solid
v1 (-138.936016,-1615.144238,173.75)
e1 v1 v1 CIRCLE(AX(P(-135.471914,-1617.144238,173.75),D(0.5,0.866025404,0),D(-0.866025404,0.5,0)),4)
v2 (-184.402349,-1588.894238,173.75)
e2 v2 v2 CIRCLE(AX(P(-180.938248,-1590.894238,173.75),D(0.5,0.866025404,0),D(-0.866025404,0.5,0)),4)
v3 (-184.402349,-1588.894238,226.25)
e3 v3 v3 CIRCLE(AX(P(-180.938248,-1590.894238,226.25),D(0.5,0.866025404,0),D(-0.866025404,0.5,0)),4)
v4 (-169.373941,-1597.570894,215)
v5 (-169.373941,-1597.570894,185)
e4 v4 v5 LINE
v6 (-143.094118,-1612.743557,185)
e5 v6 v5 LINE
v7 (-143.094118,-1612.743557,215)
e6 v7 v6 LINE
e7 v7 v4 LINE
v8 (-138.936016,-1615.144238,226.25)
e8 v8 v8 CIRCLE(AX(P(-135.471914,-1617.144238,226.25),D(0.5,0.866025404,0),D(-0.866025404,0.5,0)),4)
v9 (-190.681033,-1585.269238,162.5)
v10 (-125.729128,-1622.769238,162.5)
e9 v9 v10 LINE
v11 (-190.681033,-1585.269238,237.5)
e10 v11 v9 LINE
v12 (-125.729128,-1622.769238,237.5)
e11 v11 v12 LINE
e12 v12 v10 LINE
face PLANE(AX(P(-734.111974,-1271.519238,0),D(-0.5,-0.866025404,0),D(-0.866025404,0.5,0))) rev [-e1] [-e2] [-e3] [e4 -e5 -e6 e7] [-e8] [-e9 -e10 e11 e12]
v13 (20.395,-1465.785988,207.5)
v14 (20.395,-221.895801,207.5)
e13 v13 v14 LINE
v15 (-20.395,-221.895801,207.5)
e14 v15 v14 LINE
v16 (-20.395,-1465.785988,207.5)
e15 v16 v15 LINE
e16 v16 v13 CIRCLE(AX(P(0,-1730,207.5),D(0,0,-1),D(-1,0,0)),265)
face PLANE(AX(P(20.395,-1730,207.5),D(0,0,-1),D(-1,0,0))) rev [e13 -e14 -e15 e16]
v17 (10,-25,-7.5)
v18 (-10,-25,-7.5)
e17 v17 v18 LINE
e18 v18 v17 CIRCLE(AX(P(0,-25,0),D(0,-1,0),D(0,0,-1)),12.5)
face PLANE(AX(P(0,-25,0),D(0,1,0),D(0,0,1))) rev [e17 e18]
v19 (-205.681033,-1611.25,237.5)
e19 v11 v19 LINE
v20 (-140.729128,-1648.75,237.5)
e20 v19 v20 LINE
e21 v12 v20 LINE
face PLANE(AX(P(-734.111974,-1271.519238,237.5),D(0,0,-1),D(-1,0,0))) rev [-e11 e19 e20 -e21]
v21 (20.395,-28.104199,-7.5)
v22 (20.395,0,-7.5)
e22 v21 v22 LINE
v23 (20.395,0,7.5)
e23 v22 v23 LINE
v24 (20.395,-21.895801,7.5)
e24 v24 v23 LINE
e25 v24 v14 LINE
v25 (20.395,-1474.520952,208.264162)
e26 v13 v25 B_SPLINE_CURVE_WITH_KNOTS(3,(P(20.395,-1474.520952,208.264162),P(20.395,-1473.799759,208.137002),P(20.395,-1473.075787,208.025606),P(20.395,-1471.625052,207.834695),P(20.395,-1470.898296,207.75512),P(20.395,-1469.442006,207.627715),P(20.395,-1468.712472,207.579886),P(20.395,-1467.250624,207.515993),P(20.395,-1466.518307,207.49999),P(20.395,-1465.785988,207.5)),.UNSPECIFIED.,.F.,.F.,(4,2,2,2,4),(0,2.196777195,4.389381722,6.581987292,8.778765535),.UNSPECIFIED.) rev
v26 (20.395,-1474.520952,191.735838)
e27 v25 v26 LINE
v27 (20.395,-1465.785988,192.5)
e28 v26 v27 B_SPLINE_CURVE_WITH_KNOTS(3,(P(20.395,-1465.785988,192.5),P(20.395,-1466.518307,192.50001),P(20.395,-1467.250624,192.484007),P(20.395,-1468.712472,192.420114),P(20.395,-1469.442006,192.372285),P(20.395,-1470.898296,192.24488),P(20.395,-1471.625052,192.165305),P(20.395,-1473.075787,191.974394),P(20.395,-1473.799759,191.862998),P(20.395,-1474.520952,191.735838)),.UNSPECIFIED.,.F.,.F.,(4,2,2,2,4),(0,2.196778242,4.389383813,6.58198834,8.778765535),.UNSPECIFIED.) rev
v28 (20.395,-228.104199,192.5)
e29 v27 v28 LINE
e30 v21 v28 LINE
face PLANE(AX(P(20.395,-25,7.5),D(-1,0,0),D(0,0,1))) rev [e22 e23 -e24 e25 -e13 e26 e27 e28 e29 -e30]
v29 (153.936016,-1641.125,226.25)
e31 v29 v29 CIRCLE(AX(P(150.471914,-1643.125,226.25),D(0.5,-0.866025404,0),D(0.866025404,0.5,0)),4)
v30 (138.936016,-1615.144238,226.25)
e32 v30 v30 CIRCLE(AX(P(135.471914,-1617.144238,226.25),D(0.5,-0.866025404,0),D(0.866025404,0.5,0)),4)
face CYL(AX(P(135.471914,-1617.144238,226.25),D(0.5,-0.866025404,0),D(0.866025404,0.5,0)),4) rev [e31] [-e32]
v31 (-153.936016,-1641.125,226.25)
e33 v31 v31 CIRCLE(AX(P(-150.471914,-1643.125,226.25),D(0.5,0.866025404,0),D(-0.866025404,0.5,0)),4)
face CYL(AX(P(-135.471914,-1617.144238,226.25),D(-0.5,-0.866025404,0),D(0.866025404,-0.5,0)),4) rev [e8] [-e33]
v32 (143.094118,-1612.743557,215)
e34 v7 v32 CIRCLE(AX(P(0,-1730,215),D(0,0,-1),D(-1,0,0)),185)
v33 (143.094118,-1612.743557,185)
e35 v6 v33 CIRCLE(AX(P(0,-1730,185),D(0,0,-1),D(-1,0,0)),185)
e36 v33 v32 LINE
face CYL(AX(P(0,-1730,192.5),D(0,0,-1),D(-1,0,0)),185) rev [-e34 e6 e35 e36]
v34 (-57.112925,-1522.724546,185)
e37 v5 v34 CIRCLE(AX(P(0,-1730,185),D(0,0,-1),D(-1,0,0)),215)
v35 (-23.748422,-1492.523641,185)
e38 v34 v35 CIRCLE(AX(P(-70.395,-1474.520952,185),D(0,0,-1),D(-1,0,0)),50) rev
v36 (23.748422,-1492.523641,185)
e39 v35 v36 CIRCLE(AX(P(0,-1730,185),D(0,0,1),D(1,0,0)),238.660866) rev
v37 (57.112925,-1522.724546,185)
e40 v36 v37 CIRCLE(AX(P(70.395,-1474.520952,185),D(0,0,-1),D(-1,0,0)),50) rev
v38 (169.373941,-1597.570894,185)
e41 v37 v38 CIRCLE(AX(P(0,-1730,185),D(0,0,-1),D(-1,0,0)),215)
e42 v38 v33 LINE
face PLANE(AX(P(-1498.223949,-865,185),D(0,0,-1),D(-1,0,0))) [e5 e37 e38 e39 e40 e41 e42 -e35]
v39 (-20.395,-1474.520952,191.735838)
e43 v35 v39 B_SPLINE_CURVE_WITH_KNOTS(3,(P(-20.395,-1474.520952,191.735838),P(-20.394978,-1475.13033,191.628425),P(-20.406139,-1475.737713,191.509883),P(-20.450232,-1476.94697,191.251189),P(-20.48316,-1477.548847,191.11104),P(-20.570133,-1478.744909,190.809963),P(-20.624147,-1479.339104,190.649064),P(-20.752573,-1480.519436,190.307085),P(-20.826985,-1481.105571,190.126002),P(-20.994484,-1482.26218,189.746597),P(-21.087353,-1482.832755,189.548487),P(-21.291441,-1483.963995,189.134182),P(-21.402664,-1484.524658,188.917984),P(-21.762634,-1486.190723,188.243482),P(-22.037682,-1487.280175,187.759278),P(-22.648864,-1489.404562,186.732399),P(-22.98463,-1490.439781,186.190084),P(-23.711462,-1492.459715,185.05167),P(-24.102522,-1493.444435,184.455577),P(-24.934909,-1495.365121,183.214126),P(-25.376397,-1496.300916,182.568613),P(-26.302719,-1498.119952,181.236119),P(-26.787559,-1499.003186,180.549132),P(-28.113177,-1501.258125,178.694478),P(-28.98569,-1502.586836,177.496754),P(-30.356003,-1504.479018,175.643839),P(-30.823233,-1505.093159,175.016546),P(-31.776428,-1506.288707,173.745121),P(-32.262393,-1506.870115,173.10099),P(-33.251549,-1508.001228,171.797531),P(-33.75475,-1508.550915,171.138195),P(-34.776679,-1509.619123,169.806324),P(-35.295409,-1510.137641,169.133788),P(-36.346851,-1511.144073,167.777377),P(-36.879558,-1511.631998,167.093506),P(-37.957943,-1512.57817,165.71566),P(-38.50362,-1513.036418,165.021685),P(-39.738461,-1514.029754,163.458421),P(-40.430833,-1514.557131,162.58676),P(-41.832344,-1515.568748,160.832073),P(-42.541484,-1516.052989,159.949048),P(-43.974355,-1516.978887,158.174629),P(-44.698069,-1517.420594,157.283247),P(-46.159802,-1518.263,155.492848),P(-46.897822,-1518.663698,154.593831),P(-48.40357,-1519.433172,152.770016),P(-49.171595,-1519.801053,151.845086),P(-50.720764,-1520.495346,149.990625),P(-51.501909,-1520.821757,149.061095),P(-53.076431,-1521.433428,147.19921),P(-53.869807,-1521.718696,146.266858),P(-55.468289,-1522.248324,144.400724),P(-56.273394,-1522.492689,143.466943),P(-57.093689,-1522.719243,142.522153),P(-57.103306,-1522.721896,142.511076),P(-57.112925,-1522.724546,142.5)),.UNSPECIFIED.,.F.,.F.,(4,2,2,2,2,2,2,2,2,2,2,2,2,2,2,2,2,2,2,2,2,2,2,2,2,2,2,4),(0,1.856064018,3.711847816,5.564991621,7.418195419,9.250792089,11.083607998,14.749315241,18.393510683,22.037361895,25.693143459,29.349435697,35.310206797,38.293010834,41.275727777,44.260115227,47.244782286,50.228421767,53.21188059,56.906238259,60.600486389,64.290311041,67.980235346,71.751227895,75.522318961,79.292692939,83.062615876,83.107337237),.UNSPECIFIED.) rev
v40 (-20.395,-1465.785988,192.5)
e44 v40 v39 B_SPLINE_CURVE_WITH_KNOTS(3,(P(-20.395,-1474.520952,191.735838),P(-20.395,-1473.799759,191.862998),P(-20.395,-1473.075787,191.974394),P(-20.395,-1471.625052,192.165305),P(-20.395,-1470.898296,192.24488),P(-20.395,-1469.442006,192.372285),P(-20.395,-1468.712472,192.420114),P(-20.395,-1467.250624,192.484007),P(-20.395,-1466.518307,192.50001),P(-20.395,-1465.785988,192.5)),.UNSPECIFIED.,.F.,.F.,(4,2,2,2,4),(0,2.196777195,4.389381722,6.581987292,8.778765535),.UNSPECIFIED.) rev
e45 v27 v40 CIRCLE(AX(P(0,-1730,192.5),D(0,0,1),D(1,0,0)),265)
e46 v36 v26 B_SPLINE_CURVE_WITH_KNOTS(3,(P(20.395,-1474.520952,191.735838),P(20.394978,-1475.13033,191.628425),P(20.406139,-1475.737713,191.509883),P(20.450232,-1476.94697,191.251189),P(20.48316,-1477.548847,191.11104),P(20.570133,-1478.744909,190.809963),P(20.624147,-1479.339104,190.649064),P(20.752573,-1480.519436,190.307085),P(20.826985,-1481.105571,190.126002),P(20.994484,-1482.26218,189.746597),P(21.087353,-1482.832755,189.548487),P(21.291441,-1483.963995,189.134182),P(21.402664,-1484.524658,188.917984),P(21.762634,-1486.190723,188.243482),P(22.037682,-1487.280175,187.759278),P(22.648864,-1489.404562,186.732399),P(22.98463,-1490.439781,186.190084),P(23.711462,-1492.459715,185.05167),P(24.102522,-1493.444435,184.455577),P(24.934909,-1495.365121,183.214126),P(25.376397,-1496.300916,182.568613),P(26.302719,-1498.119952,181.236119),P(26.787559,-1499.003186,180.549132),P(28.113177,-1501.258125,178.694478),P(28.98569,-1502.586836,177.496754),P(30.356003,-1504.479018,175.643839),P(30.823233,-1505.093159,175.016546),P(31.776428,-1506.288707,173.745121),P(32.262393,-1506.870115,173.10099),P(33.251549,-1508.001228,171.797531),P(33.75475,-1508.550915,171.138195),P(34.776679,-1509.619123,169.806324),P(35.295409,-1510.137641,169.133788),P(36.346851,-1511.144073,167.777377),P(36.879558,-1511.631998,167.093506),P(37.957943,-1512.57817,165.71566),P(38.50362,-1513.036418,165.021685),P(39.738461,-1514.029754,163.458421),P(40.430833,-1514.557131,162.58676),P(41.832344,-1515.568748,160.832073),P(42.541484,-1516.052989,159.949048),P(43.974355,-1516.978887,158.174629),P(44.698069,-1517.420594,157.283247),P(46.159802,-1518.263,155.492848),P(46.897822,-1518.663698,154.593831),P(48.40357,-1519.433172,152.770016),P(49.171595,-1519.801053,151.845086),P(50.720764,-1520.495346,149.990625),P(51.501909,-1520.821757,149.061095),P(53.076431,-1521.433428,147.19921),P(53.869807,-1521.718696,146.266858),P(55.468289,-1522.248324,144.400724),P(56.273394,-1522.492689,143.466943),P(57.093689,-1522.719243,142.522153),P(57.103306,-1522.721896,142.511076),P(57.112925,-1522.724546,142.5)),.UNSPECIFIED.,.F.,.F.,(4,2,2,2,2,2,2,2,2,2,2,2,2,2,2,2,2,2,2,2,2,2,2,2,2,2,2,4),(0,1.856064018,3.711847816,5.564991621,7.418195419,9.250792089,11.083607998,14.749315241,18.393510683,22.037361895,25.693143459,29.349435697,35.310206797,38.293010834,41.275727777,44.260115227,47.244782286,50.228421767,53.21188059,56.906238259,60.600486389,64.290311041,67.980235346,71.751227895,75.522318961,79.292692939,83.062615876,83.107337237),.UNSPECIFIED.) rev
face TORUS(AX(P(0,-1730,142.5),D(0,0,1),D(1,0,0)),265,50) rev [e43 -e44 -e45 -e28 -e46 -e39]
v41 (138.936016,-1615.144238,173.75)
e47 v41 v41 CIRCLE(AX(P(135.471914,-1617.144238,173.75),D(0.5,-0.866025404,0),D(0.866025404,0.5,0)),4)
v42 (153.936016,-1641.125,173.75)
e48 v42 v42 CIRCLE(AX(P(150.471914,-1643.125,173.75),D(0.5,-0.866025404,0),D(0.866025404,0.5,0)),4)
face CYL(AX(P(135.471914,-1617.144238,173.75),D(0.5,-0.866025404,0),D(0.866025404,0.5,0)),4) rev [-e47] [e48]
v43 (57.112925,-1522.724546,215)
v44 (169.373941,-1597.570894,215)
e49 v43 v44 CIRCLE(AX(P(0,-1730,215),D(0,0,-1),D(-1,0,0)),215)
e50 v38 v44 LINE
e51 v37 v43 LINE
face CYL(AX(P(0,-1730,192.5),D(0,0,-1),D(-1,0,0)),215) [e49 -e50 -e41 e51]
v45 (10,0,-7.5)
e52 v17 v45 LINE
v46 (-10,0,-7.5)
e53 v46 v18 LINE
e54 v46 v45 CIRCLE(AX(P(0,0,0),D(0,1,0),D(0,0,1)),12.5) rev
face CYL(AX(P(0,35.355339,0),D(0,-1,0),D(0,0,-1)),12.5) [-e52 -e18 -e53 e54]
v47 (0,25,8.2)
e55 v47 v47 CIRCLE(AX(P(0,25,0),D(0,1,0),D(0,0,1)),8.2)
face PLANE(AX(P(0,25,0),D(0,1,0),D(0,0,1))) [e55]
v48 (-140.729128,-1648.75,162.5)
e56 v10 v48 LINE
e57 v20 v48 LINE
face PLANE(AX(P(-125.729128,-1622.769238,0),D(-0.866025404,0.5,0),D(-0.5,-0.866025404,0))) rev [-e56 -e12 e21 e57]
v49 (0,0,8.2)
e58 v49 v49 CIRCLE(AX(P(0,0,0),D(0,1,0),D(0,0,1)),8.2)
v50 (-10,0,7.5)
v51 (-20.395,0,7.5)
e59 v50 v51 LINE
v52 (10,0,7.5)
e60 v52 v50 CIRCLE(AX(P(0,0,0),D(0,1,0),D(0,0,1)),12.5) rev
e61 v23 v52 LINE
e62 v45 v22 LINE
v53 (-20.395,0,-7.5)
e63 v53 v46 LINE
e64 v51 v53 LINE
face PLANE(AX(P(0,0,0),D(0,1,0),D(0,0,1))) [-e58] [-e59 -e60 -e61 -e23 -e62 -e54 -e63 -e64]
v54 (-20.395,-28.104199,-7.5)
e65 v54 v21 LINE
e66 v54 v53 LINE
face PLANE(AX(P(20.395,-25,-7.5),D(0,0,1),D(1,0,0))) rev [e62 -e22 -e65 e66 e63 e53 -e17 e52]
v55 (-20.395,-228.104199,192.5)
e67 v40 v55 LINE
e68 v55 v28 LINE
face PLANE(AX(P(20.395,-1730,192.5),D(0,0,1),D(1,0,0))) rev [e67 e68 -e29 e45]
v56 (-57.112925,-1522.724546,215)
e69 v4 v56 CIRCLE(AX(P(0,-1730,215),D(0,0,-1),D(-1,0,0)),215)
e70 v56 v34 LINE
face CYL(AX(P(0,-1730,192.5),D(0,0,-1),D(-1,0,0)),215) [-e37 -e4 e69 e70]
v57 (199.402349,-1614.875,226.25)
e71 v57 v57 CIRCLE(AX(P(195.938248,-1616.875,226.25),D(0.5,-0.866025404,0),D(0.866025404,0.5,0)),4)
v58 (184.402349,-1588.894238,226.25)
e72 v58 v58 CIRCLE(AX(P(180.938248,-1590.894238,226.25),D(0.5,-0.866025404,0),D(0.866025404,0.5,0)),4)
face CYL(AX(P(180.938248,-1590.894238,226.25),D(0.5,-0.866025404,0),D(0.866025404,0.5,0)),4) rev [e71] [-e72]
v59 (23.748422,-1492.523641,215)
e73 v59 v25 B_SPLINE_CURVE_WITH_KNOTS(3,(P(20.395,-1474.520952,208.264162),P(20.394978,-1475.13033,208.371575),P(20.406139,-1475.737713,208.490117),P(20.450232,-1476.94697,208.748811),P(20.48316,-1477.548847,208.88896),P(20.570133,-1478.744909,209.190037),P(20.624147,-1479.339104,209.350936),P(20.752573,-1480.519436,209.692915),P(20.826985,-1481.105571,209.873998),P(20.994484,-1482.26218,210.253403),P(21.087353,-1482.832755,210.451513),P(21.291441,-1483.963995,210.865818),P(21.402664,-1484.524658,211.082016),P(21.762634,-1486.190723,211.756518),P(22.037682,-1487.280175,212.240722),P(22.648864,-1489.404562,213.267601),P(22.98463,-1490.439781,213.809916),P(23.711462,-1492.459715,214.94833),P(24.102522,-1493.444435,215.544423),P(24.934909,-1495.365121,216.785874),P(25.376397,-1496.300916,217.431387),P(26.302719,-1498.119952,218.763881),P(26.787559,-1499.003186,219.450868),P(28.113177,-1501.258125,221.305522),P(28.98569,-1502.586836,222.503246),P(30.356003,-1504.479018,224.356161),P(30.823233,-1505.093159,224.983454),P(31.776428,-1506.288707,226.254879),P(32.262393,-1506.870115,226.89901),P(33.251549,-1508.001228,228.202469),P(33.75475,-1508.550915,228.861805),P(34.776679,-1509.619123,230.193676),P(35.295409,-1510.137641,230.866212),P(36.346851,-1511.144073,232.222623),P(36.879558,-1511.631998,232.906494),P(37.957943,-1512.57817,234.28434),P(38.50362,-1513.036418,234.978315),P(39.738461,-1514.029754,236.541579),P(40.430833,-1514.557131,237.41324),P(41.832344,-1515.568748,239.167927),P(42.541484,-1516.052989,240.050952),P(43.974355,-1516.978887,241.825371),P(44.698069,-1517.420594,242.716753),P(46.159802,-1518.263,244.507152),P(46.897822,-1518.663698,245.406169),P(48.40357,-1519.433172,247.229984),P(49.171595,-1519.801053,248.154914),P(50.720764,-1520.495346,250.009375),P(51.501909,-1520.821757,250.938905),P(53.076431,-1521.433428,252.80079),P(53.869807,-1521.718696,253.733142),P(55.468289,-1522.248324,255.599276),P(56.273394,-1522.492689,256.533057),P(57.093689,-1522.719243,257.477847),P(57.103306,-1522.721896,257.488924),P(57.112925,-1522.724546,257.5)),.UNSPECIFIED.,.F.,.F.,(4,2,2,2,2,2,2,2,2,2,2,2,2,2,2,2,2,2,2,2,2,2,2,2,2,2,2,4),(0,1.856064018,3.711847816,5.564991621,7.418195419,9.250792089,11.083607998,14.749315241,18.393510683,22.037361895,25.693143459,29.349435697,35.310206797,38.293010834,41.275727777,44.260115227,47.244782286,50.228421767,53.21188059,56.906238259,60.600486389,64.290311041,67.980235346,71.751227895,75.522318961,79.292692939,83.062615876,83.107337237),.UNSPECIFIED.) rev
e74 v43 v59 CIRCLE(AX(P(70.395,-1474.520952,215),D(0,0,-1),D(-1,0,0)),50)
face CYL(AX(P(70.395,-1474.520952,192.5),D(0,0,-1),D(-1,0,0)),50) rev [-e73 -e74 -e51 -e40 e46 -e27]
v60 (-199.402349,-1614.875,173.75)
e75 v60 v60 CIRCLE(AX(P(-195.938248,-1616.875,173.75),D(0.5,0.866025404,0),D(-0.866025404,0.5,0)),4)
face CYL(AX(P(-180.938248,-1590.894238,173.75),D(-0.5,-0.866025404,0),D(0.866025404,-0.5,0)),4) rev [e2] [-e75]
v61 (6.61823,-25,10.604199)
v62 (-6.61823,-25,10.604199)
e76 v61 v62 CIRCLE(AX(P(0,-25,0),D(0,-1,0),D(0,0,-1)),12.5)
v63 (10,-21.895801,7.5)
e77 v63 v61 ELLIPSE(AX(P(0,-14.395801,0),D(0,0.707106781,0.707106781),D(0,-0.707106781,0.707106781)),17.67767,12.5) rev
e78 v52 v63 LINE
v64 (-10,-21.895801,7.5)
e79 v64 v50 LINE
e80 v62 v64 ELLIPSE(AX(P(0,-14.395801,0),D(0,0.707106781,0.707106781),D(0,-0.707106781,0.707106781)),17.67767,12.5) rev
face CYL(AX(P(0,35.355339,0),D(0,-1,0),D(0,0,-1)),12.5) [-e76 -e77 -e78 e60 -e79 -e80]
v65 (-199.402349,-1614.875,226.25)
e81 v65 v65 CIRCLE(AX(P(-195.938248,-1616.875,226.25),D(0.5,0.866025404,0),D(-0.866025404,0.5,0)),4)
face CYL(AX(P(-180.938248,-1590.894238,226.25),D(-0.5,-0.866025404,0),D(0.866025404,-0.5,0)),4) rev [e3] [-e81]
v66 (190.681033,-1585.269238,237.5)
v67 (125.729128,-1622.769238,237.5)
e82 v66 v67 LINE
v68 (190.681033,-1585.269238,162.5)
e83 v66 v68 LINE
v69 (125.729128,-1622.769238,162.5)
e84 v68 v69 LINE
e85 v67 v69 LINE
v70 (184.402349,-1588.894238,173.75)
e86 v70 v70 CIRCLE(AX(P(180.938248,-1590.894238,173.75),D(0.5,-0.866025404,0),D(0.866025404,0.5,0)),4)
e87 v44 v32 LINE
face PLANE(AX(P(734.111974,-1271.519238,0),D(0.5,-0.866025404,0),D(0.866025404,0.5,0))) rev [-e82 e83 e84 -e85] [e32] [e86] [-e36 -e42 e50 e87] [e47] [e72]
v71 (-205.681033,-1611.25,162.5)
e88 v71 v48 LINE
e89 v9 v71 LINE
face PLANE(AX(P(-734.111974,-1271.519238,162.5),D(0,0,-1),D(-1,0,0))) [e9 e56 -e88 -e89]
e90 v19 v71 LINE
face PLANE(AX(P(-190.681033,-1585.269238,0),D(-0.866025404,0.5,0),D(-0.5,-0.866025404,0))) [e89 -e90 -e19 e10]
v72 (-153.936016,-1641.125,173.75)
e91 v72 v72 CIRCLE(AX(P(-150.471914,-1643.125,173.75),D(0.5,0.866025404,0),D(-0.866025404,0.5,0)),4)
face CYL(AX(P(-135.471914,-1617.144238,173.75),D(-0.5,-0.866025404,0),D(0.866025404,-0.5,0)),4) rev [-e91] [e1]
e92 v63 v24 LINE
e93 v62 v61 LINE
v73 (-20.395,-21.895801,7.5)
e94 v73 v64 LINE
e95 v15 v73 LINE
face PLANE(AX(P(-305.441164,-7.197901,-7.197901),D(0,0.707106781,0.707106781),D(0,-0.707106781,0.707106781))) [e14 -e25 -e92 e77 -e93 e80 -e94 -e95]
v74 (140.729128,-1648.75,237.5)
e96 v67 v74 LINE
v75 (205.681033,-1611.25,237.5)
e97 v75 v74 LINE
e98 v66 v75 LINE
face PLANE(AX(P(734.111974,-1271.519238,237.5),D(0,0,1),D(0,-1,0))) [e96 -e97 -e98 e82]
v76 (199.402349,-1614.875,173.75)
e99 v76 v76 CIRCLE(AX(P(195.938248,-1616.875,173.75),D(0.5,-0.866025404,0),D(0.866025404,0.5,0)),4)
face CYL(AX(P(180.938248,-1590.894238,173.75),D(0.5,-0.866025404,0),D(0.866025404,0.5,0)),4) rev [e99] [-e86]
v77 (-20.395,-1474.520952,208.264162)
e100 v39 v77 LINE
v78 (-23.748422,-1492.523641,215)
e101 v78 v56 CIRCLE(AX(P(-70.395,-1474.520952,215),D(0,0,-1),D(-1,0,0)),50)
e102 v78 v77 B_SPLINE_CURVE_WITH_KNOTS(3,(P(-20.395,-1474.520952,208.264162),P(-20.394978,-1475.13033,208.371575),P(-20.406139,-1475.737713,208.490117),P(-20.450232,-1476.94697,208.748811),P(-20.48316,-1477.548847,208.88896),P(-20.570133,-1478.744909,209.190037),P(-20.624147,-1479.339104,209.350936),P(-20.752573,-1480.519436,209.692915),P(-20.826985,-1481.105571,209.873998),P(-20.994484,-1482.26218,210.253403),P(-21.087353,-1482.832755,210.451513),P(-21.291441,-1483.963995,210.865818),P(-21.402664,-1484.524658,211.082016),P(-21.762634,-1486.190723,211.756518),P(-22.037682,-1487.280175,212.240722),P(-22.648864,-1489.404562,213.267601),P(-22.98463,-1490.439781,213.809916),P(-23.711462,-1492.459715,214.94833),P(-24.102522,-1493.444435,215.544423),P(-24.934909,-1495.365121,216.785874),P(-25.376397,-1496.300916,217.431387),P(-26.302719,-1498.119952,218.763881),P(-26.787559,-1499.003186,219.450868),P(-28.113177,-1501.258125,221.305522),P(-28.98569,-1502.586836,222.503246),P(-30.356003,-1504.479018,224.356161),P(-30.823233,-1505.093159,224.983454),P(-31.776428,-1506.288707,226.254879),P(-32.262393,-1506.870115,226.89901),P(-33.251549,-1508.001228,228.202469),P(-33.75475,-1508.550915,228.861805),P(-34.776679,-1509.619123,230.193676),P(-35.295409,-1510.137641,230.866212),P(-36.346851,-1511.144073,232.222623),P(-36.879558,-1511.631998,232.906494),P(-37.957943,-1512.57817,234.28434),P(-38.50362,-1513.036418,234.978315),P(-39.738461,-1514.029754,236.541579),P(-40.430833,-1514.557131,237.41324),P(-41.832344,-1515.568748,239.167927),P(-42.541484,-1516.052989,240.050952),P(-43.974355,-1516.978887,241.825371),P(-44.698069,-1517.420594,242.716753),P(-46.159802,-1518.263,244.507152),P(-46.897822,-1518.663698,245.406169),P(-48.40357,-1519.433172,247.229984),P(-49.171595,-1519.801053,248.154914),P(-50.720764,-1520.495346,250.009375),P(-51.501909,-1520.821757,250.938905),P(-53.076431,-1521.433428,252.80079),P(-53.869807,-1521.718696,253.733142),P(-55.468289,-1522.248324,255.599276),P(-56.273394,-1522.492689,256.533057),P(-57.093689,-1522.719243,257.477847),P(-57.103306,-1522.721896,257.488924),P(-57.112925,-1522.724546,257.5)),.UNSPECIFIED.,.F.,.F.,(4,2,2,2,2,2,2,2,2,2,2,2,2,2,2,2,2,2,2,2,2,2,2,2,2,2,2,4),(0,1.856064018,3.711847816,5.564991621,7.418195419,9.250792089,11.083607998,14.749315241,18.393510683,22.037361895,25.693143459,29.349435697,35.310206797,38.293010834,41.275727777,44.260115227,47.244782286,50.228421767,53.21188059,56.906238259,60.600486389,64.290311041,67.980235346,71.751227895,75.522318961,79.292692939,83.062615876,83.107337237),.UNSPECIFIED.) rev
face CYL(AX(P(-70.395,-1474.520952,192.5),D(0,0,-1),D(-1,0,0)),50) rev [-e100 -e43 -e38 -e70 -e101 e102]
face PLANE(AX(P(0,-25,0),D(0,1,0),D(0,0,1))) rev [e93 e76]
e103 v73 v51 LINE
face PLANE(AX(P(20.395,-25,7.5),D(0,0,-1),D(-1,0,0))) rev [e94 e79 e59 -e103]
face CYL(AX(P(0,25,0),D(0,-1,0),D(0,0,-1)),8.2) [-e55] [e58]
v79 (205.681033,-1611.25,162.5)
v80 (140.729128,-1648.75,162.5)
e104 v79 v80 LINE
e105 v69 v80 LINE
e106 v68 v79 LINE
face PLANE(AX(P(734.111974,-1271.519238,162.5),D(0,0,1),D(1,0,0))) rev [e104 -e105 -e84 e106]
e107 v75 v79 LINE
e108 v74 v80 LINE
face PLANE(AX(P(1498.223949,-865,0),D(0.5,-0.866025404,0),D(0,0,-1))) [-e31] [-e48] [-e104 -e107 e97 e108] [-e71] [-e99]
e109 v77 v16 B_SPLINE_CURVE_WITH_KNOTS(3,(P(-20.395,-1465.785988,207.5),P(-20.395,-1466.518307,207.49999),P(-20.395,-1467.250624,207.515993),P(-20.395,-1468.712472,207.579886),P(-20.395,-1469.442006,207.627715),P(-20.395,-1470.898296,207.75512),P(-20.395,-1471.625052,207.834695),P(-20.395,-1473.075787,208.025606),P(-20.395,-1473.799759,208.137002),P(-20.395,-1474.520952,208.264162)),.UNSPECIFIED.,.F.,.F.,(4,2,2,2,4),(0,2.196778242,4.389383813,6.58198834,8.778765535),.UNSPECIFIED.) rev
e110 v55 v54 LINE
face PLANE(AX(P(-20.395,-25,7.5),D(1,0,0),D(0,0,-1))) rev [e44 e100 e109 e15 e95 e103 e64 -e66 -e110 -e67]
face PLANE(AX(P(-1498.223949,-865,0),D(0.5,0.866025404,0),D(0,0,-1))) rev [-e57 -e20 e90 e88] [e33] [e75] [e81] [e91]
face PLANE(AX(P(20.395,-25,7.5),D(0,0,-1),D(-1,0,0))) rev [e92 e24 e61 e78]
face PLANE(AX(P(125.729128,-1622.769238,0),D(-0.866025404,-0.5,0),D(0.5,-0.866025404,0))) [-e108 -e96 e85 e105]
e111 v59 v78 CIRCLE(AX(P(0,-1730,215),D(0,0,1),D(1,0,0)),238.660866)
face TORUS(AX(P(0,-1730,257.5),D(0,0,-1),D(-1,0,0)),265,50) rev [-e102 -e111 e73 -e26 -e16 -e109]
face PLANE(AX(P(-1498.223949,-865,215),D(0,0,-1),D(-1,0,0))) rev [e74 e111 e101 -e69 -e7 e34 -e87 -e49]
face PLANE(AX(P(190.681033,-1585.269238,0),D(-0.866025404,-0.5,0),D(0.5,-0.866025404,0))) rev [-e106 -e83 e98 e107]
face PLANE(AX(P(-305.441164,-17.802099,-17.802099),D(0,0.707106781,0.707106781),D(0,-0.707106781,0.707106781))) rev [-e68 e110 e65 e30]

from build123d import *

# Parameters (mm, degrees)
SKETCH1_R                = 8.2
BOSS_EXTRUDE1_DEPTH      = 25
SKETCH2_W                = 40.79
SKETCH2_H                = 15
BOSS_EXTRUDE2_DEPTH      = 25
SKETCH3_R                = 12.5
BOSS_EXTRUDE4_DEPTH      = 25
BOSS_EXTRUDE5_REACH      = 51.448
SKETCH5_W                = 40.79
SKETCH5_H                = 15
BOSS_EXTRUDE7_DEPTH      = 1505
BOSS_EXTRUDE8_START      = -40.79
BOSS_EXTRUDE8_DEPTH      = 40.79
SKETCH9_W                = 15
SKETCH9_H                = 15
REVOLVE1_ANGLE           = 60
REVOLVE1_OTHER_WAY_ANGLE = 60
FILLET3_R                = 50
SKETCH11_W               = 75
SKETCH11_H               = 75
SKETCH11_R               = 4
BOSS_EXTRUDE9_DEPTH      = 30
CUT_EXTRUDE2_DEPTH       = 1755.203433898


with BuildPart() as part:
    # Sketch1 → Boss-Extrude1 (new body)
    with BuildSketch(Plane(origin=(0, 0, 0), x_dir=(1, 0, 0), z_dir=(0, 1, 0))):
        with Locations(Location((0, 0, 0), (0, 0, 270))):
            Circle(SKETCH1_R)
    extrude(amount=BOSS_EXTRUDE1_DEPTH)

    # Sketch2 → Boss-Extrude2 (add)
    with BuildSketch(Plane(origin=(0, 0, 0), x_dir=(-1, 0, 0), z_dir=(0, -1, 0))):
        Rectangle(SKETCH2_W, SKETCH2_H)
    extrude(amount=BOSS_EXTRUDE2_DEPTH)

    # Sketch3 → Boss-Extrude4 (add)
    with BuildSketch(Plane(origin=(0, -25, 0), x_dir=(-1, 0, 0), z_dir=(0, -1, 0))):
        Circle(SKETCH3_R)
    extrude(amount=-BOSS_EXTRUDE4_DEPTH)

    # Boss-Extrude5: up to this face of the body (flat: up to its plane)
    boss_extrude5_end = Plane(part.part.faces().sort_by_distance((20.395, -12.5, 0))[0])
    # Sketch4 → Boss-Extrude5 (add, up to the picked face)
    with BuildSketch(Plane.ZY.offset(20.395), mode=Mode.PRIVATE) as boss_extrude5_sk1:
        Polygon((192.5, -225), (-7.5, -25), (7.5, -25), (207.5, -225), align=None)
    boss_extrude5_tool1 = split(extrude(boss_extrude5_sk1.sketch, amount=-BOSS_EXTRUDE5_REACH, mode=Mode.PRIVATE), bisect_by=boss_extrude5_end, keep=Keep.BOTH, mode=Mode.PRIVATE)
    add(boss_extrude5_tool1.solids().sort_by(Axis((-20.395, -125, 100), (1, 0, 0)))[0])

    # Sketch5 → Boss-Extrude7 (add)
    with BuildSketch(Plane(origin=(0, -225, 0), x_dir=(-1, 0, 0), z_dir=(0, -1, 0))):
        with Locations((0, -200)):
            Rectangle(SKETCH5_W, SKETCH5_H)
    extrude(amount=BOSS_EXTRUDE7_DEPTH)

    # Sketch7 → Boss-Extrude8 (add)
    with BuildSketch(Plane(origin=(20.395, 0, 0), x_dir=(0, 0, -1), z_dir=(1, 0, 0)).offset(BOSS_EXTRUDE8_START)):
        Polygon((1.552099385, -34.052099385), (0, -32.5), (-192.5, -225), (-192.5, -228.104198769), align=None)
        Polygon((7.5, -25), (0, -32.5), (1.552099385, -34.052099385), (7.5, -28.104198769), align=None)
        Polygon((-9.052099385, -23.447900615), (-207.5, -221.895801231), (-207.5, -225), (-7.5, -25), align=None)
        Polygon((-9.052099385, -23.447900615), (-7.5, -25), (-7.5, -21.895801231), align=None)
    extrude(amount=BOSS_EXTRUDE8_DEPTH)

    # Sketch9 → Revolve1 (revolve)
    with BuildSketch(Plane(origin=(0, 0, 0), x_dir=(0, 0, -1), z_dir=(1, 0, 0))):
        with Locations((-207.5, -1522.5)):
            Rectangle(SKETCH9_W, SKETCH9_H)
        Polygon((-185, -1545), (-185, -1530), (-200, -1530), (-215, -1530), (-215, -1545), align=None)
        with Locations((-192.5, -1522.5)):
            Rectangle(SKETCH9_W, SKETCH9_H)
    revolve(axis=Axis((0, -1730, 192.5), (0, 0, 1)), revolution_arc=REVOLVE1_ANGLE)

    # Sketch9 → Revolve1 other way (revolve)
    with BuildSketch(Plane(origin=(0, 0, 0), x_dir=(0, 0, -1), z_dir=(1, 0, 0))):
        with Locations((-207.5, -1522.5)):
            Rectangle(SKETCH9_W, SKETCH9_H)
        Polygon((-185, -1545), (-185, -1530), (-200, -1530), (-215, -1530), (-215, -1545), align=None)
        with Locations((-192.5, -1522.5)):
            Rectangle(SKETCH9_W, SKETCH9_H)
    revolve(axis=Axis((0, -1730, 192.5), (0, 0, -1)), revolution_arc=REVOLVE1_OTHER_WAY_ANGLE)

    # Fillet3
    # the kernel refuses this fillet: 50 mm, written as the material it adds along each edge
    with BuildSketch(Plane(origin=(0, -1730, 207.5), x_dir=(0.6259913130832682, 0.7798300301631668, 0), z_dir=(0.7798300301631668, -0.6259913130832682, 0))) as fillet3_piece_1_section:
        with BuildLine():
            CenterArc((215 + FILLET3_R, FILLET3_R), FILLET3_R, 180, 90)
            Line((215, FILLET3_R), (215, 0))
            Line((215, 0), (215 + FILLET3_R, 0))
        make_face()
    fillet3_piece_1 = revolve(axis=Axis((0, -1730, 207.5), (0, 0, 1)), revolution_arc=77.509968484, mode=Mode.PRIVATE)
    fillet3_piece_1 = split(fillet3_piece_1, bisect_by=Plane(origin=(20.395, -1497.728593149, 210.201005202), z_dir=(-1, 0, 0)), keep=Keep.TOP, mode=Mode.PRIVATE)
    fillet3_piece_1 = split(fillet3_piece_1, bisect_by=Plane(origin=(-20.395, -1497.728593149, 210.201005202), z_dir=(1, 0, 0)), keep=Keep.TOP, mode=Mode.PRIVATE)
    fillet3_piece_1 = split(fillet3_piece_1, bisect_by=Plane(origin=(0, -1497.728593149, 215), z_dir=(0, 0, -1)), keep=Keep.TOP, mode=Mode.PRIVATE)
    add(fillet3_piece_1)
    with BuildSketch(Plane(origin=(-20.395, -1515.969525593, 192.5), x_dir=(-0.9834951946600375, -0.1809342479482942, 0), z_dir=(0, 0, 1))) as fillet3_piece_2:
        with BuildLine():
            CenterArc((41.675293239, -49.811185367), FILLET3_R, 94.980893043, 74.594925131)
            Line((-7.499466494, -40.764472969), (0, 0))
            ThreePointArc((0, 0), (18.66705843, -0.811902923), (37.33411686, 0))
        make_face()
    extrude(amount=15)
    with BuildSketch(Plane(origin=(0, -1730, 192.5), x_dir=(0.6259913130832687, 0.7798300301631664, 0), z_dir=(0.7798300301631664, -0.6259913130832687, 0))) as fillet3_piece_3_section:
        with BuildLine():
            CenterArc((215 + FILLET3_R, -FILLET3_R), FILLET3_R, 90, 90)
            Line((215 + FILLET3_R, 0), (215, 0))
            Line((215, 0), (215, -FILLET3_R))
        make_face()
    fillet3_piece_3 = revolve(axis=Axis((0, -1730, 192.5), (0, 0, 1)), revolution_arc=77.509968484, mode=Mode.PRIVATE)
    fillet3_piece_3 = split(fillet3_piece_3, bisect_by=Plane(origin=(0, -1497.728593149, 185), z_dir=(0, 0, 1)), keep=Keep.TOP, mode=Mode.PRIVATE)
    fillet3_piece_3 = split(fillet3_piece_3, bisect_by=Plane(origin=(-20.395, -1497.728593149, 189.798994798), z_dir=(1, 0, 0)), keep=Keep.TOP, mode=Mode.PRIVATE)
    fillet3_piece_3 = split(fillet3_piece_3, bisect_by=Plane(origin=(20.395, -1497.728593149, 189.798994798), z_dir=(-1, 0, 0)), keep=Keep.TOP, mode=Mode.PRIVATE)
    add(fillet3_piece_3)
    with BuildSketch(Plane(origin=(20.395, -1515.969525593, 192.5), x_dir=(0.9834951946600374, -0.18093424794829469, 0), z_dir=(0, 0, 1))) as fillet3_piece_4:
        with BuildLine():
            CenterArc((41.675293239, 49.811185367), FILLET3_R, 190.424181826, 74.594925131)
            Line((-7.499466494, 40.764472969), (0, 0))
            ThreePointArc((0, 0), (18.66705843, 0.811902923), (37.33411686, 0))
        make_face()
    extrude(amount=15)
    with BuildSketch(Plane(origin=(0, -1730, 207.5), x_dir=(0.6259913130832682, 0.7798300301631668, 0), z_dir=(0.7798300301631668, -0.6259913130832682, 0))) as fillet3_piece_5a_section:
        with BuildLine():
            CenterArc((215 + FILLET3_R, FILLET3_R), FILLET3_R, 180, 90)
            Line((215, FILLET3_R), (215, 0))
            Line((215, 0), (215 + FILLET3_R, 0))
        make_face()
    fillet3_piece_5a = revolve(axis=Axis((0, -1730, 207.5), (0, 0, 1)), revolution_arc=77.509968484, mode=Mode.PRIVATE)
    fillet3_piece_5a = split(fillet3_piece_5a, bisect_by=Plane(origin=(20.395, -1516.663886588, 210.150724115), z_dir=(1, 0, 0)), keep=Keep.TOP, mode=Mode.PRIVATE)
    fillet3_piece_5a = split(fillet3_piece_5a, bisect_by=Plane(origin=(85.698064456, -1516.663886588, 215), z_dir=(0, 0, -1)), keep=Keep.TOP, mode=Mode.PRIVATE)
    with BuildSketch(Plane(origin=(20.395, -1515.969525593, 192.5), x_dir=(0.9834951946600374, -0.18093424794829469, 0), z_dir=(0, 0, 1))) as fillet3_piece_5b_section:
        with BuildLine():
            CenterArc((41.675293239, 49.811185367), FILLET3_R, 190.424181826, 74.594925131)
            Line((-7.499466494, 40.764472969), (0, 0))
            ThreePointArc((0, 0), (18.66705843, 0.811902923), (37.33411686, 0))
        make_face()
    fillet3_piece_5b = extrude(amount=118.621434021, mode=Mode.PRIVATE)
    fillet3_piece_5b = split(fillet3_piece_5b, bisect_by=Plane(origin=(28.539652215, -1507.603520272, 207.5), z_dir=(0, 0, 1)), keep=Keep.TOP, mode=Mode.PRIVATE)
    fillet3_piece_5b = split(fillet3_piece_5b, bisect_by=Plane(origin=(28.539652215, -1507.603520272, 215), z_dir=(0, 0, -1)), keep=Keep.TOP, mode=Mode.PRIVATE)
    fillet3_piece_5 = fillet3_piece_5a & fillet3_piece_5b
    add(fillet3_piece_5)
    with BuildSketch(Plane(origin=(0, -1730, 207.5), x_dir=(0.6259913130832682, 0.7798300301631668, 0), z_dir=(0.7798300301631668, -0.6259913130832682, 0))) as fillet3_piece_6a_section:
        with BuildLine():
            CenterArc((215 + FILLET3_R, FILLET3_R), FILLET3_R, 180, 90)
            Line((215, FILLET3_R), (215, 0))
            Line((215, 0), (215 + FILLET3_R, 0))
        make_face()
    fillet3_piece_6a = revolve(axis=Axis((0, -1730, 207.5), (0, 0, 1)), revolution_arc=77.509968484, mode=Mode.PRIVATE)
    fillet3_piece_6a = split(fillet3_piece_6a, bisect_by=Plane(origin=(-20.395, -1516.663887252, 210.150724175), z_dir=(-1, 0, 0)), keep=Keep.TOP, mode=Mode.PRIVATE)
    fillet3_piece_6a = split(fillet3_piece_6a, bisect_by=Plane(origin=(-85.69806423, -1516.663887252, 215), z_dir=(0, 0, -1)), keep=Keep.TOP, mode=Mode.PRIVATE)
    with BuildSketch(Plane(origin=(-20.395, -1515.969525593, 192.5), x_dir=(-0.9834951946600375, -0.1809342479482942, 0), z_dir=(0, 0, 1))) as fillet3_piece_6b_section:
        with BuildLine():
            CenterArc((41.675293239, -49.811185367), FILLET3_R, 94.980893043, 74.594925131)
            Line((-7.499466494, -40.764472969), (0, 0))
            ThreePointArc((0, 0), (18.66705843, -0.811902923), (37.33411686, 0))
        make_face()
    fillet3_piece_6b = extrude(amount=118.621434021, mode=Mode.PRIVATE)
    fillet3_piece_6b = split(fillet3_piece_6b, bisect_by=Plane(origin=(-28.539652215, -1507.603520272, 207.5), z_dir=(0, 0, 1)), keep=Keep.TOP, mode=Mode.PRIVATE)
    fillet3_piece_6b = split(fillet3_piece_6b, bisect_by=Plane(origin=(-28.539652215, -1507.603520272, 215), z_dir=(0, 0, -1)), keep=Keep.TOP, mode=Mode.PRIVATE)
    fillet3_piece_6 = fillet3_piece_6a & fillet3_piece_6b
    add(fillet3_piece_6)
    with BuildSketch(Plane(origin=(0, -1730, 192.5), x_dir=(0.6259913130832687, 0.7798300301631664, 0), z_dir=(0.7798300301631664, -0.6259913130832687, 0))) as fillet3_piece_7a_section:
        with BuildLine():
            CenterArc((215 + FILLET3_R, -FILLET3_R), FILLET3_R, 90, 90)
            Line((215 + FILLET3_R, 0), (215, 0))
            Line((215, 0), (215, -FILLET3_R))
        make_face()
    fillet3_piece_7a = revolve(axis=Axis((0, -1730, 192.5), (0, 0, 1)), revolution_arc=77.509968484, mode=Mode.PRIVATE)
    fillet3_piece_7a = split(fillet3_piece_7a, bisect_by=Plane(origin=(-85.69806423, -1516.663887252, 185), z_dir=(0, 0, 1)), keep=Keep.TOP, mode=Mode.PRIVATE)
    fillet3_piece_7a = split(fillet3_piece_7a, bisect_by=Plane(origin=(-20.395, -1516.663887252, 189.849275825), z_dir=(-1, 0, 0)), keep=Keep.TOP, mode=Mode.PRIVATE)
    with BuildSketch(Plane(origin=(-20.395, -1515.969525593, 88.878565979), x_dir=(-0.9834951946600375, -0.1809342479482942, 0), z_dir=(0, 0, 1))) as fillet3_piece_7b_section:
        with BuildLine():
            CenterArc((41.675293239, -49.811185367), FILLET3_R, 94.980893043, 74.594925131)
            Line((-7.499466494, -40.764472969), (0, 0))
            ThreePointArc((0, 0), (18.66705843, -0.811902923), (37.33411686, 0))
        make_face()
    fillet3_piece_7b = extrude(amount=118.621434021, mode=Mode.PRIVATE)
    fillet3_piece_7b = split(fillet3_piece_7b, bisect_by=Plane(origin=(-28.539652215, -1507.603520272, 185), z_dir=(0, 0, 1)), keep=Keep.TOP, mode=Mode.PRIVATE)
    fillet3_piece_7b = split(fillet3_piece_7b, bisect_by=Plane(origin=(-28.539652215, -1507.603520272, 192.5), z_dir=(0, 0, -1)), keep=Keep.TOP, mode=Mode.PRIVATE)
    fillet3_piece_7 = fillet3_piece_7a & fillet3_piece_7b
    add(fillet3_piece_7)
    with BuildSketch(Plane(origin=(0, -1730, 192.5), x_dir=(0.6259913130832687, 0.7798300301631664, 0), z_dir=(0.7798300301631664, -0.6259913130832687, 0))) as fillet3_piece_8a_section:
        with BuildLine():
            CenterArc((215 + FILLET3_R, -FILLET3_R), FILLET3_R, 90, 90)
            Line((215 + FILLET3_R, 0), (215, 0))
            Line((215, 0), (215, -FILLET3_R))
        make_face()
    fillet3_piece_8a = revolve(axis=Axis((0, -1730, 192.5), (0, 0, 1)), revolution_arc=77.509968484, mode=Mode.PRIVATE)
    fillet3_piece_8a = split(fillet3_piece_8a, bisect_by=Plane(origin=(85.698064456, -1516.663886588, 185), z_dir=(0, 0, 1)), keep=Keep.TOP, mode=Mode.PRIVATE)
    fillet3_piece_8a = split(fillet3_piece_8a, bisect_by=Plane(origin=(20.395, -1516.663886588, 189.849275885), z_dir=(1, 0, 0)), keep=Keep.TOP, mode=Mode.PRIVATE)
    with BuildSketch(Plane(origin=(20.395, -1515.969525593, 88.878565979), x_dir=(0.9834951946600374, -0.1809342479482948, 0), z_dir=(0, 0, 1))) as fillet3_piece_8b_section:
        with BuildLine():
            CenterArc((41.675293239, 49.811185367), FILLET3_R, 190.424181826, 74.594925131)
            Line((-7.499466494, 40.764472969), (0, 0))
            ThreePointArc((0, 0), (18.66705843, 0.811902923), (37.33411686, 0))
        make_face()
    fillet3_piece_8b = extrude(amount=118.621434021, mode=Mode.PRIVATE)
    fillet3_piece_8b = split(fillet3_piece_8b, bisect_by=Plane(origin=(28.539652215, -1507.603520272, 185), z_dir=(0, 0, 1)), keep=Keep.TOP, mode=Mode.PRIVATE)
    fillet3_piece_8b = split(fillet3_piece_8b, bisect_by=Plane(origin=(28.539652215, -1507.603520272, 192.5), z_dir=(0, 0, -1)), keep=Keep.TOP, mode=Mode.PRIVATE)
    fillet3_piece_8 = fillet3_piece_8a & fillet3_piece_8b
    add(fillet3_piece_8)

    # Sketch11 → Boss-Extrude9 (add)
    with BuildSketch(Plane(origin=(749.111974274, -1297.5, 0), x_dir=(-0.8660254037844398, -0.49999999999999806, 0), z_dir=(0.499999999999998, -0.8660254037844397, 0))):
        with Locations((665, -200)):
            Rectangle(SKETCH11_W, SKETCH11_H)
        with Locations(Location((638.75, -173.75, 0), (0, 0, 180))):
            Circle(SKETCH11_R, mode=Mode.SUBTRACT)
        with Locations(Location((691.25, -173.75, 0), (0, 0, 180))):
            Circle(SKETCH11_R, mode=Mode.SUBTRACT)
        with Locations(Location((691.25, -226.25, 0), (0, 0, 180))):
            Circle(SKETCH11_R, mode=Mode.SUBTRACT)
        with Locations(Location((638.75, -226.25, 0), (0, 0, 180))):
            Circle(SKETCH11_R, mode=Mode.SUBTRACT)
    boss_extrude9 = extrude(amount=-BOSS_EXTRUDE9_DEPTH)

    # Mirror1: Boss-Extrude9 across plane
    add(boss_extrude9.mirror(Plane(origin=(0, 0, 0), x_dir=(0, 0, 1), z_dir=(1, 0, 0))))

    # Sketch15 → Cut-Extrude2 (cut, through all)
    with BuildSketch(Plane(origin=(0, 0, 192.5), x_dir=(-1, 0, 0), z_dir=(0, 0, -1))):
        with BuildLine():
            Line((-20.395, -1730), (-20.395, -1546.127642167))
            ThreePointArc((-20.395, -1546.127642167), (0, -1545), (20.395, -1546.127642167))
            Line((20.395, -1546.127642167), (20.395, -1730))
            Line((20.395, -1730), (-20.395, -1730))
        make_face()
    extrude(amount=-CUT_EXTRUDE2_DEPTH, mode=Mode.SUBTRACT)


solid = part.part
